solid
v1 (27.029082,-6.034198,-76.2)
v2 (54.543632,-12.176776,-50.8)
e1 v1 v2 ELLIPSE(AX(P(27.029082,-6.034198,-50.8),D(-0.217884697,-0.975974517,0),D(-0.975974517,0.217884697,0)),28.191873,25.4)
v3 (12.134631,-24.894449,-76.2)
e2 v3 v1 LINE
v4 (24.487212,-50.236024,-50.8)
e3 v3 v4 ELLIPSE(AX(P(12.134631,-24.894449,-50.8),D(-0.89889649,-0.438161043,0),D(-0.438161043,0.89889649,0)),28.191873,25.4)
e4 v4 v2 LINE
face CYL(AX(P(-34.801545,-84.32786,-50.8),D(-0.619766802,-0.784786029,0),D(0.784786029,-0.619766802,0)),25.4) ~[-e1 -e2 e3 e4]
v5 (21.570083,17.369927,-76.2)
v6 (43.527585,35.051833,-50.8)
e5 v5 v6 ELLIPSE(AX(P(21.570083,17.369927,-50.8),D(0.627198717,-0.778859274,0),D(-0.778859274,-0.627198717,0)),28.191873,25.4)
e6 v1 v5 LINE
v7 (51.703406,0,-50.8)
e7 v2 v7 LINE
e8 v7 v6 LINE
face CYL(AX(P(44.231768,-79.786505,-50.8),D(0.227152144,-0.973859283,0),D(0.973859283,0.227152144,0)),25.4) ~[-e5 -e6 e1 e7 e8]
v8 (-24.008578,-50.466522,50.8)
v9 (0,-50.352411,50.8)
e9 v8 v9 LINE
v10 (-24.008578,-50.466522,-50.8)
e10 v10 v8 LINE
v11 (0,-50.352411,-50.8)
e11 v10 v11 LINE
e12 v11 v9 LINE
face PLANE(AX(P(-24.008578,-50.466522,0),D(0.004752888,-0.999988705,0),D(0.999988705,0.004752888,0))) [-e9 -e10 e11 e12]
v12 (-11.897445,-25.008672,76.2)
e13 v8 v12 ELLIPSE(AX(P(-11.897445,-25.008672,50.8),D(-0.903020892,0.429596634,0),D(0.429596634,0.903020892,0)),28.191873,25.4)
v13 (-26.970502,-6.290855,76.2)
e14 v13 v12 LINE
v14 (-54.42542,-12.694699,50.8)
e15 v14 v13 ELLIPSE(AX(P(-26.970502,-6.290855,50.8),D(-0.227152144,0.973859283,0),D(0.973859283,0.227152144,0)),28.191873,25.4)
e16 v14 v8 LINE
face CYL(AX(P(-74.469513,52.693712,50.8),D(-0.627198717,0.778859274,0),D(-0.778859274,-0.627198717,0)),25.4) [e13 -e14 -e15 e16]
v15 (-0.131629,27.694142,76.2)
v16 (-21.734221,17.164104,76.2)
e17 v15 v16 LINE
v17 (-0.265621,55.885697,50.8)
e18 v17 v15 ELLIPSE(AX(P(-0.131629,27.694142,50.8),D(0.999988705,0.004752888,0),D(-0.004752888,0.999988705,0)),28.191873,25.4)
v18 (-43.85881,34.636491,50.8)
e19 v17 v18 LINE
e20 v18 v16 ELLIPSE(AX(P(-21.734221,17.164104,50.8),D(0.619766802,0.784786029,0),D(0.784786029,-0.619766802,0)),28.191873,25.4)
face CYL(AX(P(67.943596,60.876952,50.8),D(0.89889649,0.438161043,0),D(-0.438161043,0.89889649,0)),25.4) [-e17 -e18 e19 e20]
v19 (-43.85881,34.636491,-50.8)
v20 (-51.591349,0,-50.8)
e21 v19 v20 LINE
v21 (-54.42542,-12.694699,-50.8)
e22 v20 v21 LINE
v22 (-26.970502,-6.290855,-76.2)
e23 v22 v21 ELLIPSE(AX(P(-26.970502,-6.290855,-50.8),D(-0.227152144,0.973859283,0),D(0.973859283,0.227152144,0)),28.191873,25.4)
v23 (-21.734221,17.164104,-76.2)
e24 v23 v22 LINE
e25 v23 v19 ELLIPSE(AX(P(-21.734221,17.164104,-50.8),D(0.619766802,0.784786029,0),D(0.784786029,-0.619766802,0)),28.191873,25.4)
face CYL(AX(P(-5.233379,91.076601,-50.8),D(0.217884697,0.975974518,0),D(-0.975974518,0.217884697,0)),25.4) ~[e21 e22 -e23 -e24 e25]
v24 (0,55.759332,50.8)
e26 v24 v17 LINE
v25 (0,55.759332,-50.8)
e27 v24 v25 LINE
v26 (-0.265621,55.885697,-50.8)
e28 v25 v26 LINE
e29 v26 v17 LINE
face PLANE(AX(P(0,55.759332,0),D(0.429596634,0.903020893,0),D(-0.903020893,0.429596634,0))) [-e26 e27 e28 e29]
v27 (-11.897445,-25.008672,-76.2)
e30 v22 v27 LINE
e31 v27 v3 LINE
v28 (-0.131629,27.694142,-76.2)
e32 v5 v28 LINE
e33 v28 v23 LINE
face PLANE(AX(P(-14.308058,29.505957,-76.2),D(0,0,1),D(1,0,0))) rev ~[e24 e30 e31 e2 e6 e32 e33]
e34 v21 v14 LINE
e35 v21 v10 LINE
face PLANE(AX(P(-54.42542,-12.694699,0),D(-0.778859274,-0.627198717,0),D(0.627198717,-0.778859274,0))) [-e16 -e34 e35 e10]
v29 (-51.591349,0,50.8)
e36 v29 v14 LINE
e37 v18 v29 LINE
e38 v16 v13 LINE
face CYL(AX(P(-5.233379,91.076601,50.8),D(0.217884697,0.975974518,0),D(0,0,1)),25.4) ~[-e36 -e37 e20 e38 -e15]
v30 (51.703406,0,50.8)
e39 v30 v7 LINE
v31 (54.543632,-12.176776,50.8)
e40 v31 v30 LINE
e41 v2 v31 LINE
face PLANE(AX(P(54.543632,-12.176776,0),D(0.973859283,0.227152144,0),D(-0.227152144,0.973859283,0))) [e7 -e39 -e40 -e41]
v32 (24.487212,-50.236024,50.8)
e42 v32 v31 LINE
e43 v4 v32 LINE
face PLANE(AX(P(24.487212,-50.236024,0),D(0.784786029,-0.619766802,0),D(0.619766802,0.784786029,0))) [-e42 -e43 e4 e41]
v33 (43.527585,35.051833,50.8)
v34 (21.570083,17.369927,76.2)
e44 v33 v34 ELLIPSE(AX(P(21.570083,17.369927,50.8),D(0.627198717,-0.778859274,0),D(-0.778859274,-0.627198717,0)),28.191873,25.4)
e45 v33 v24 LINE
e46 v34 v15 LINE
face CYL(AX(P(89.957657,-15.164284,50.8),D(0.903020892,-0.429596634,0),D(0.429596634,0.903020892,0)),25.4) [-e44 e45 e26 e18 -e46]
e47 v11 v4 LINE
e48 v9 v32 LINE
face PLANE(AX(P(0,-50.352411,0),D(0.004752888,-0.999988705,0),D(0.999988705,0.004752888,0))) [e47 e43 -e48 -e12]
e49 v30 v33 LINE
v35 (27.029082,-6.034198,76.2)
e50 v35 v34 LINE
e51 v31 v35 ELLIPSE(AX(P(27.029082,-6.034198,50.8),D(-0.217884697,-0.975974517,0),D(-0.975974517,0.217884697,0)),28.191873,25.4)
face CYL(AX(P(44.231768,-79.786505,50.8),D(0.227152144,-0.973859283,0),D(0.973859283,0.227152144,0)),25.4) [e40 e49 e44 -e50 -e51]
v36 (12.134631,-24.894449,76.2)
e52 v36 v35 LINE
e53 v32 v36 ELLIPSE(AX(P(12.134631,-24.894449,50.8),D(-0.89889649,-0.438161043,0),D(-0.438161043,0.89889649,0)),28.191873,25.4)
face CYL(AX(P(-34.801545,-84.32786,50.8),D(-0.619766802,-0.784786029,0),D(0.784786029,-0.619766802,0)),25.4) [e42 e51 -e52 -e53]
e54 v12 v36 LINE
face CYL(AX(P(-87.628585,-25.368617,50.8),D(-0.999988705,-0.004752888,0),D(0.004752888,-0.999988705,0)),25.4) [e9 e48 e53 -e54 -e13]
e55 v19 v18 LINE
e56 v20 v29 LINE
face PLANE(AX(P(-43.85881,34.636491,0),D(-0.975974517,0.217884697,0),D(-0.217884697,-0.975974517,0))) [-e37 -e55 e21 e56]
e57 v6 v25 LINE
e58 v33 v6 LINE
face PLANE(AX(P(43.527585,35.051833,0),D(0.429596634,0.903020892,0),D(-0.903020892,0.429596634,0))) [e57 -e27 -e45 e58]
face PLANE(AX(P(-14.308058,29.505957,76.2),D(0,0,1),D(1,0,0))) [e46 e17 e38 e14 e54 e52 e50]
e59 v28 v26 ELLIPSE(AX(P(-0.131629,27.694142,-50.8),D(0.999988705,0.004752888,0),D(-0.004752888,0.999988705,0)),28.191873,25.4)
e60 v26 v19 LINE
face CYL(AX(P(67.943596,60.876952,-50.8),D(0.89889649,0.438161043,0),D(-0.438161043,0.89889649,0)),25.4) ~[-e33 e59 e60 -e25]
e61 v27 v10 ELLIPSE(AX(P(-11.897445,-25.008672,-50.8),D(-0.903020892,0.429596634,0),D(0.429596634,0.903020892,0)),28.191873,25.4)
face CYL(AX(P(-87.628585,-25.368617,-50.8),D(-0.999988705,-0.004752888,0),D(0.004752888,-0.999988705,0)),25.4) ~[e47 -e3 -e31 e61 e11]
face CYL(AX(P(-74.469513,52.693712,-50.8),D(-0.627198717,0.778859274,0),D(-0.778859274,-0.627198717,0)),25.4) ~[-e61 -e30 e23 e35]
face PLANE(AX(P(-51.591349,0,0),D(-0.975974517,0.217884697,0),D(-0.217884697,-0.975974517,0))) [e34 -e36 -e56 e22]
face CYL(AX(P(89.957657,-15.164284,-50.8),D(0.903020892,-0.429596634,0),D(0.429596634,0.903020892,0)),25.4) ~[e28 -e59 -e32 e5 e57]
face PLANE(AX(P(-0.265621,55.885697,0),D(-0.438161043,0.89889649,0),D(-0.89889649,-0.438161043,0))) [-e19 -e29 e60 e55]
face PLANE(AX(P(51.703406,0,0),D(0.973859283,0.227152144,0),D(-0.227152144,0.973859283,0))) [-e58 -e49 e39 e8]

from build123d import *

# Parameters (mm, degrees)
F1_DEPTH     = 76.2
F2_T1_DEPTH  = 175.4963381321
F2_T3_DEPTH  = 175.4963381321
F2_T5_DEPTH  = 175.4963381321
F2_T7_DEPTH  = 175.4963381321
F2_T9_DEPTH  = 175.4963381321
F2_T11_DEPTH = 175.4963381321
F2_T13_DEPTH = 175.4963381321


# Not quite as in the source:
# - a fillet or chamfer that OpenCascade refuses, or shapes differently, is made with other operations: its cross-section is extruded or revolved along the edge and cut away or added


with BuildPart() as f1:
    # F0 (on Top) → F1 (new body, symmetric)
    with BuildSketch(Plane.XY):
        Polygon((0, 0), (0, 55.7593321666), (-0.2656214809, 55.8856970104), (-43.8588096269, 34.6364909196), align=None)
        Polygon((0, 0), (43.5275850579, 35.051833392), (0, 55.7593321666), align=None)
        Polygon((51.7034059885, 0), (43.5275850579, 35.051833392), (0, 0), align=None)
        Polygon((24.487211867, -50.2360243261), (54.5436322472, -12.1767756978), (0, 0), align=None)
        Polygon((0, -50.3524106258), (0, 0), (-24.0085784972, -50.4665220087), align=None)
        Polygon((24.487211867, -50.2360243261), (0, 0), (0, -50.3524106258), align=None)
        Polygon((-24.0085784972, -50.4665220087), (0, 0), (-54.4254195672, -12.6946992894), align=None)
        Polygon((-51.5913489447, 0), (0, 0), (-43.8588096269, 34.6364909196), align=None)
        Polygon((-54.4254195672, -12.6946992894), (0, 0), (-51.5913489447, 0), align=None)
        Polygon((0, 0), (54.5436322472, -12.1767756978), (51.7034059885, 0), align=None)
    extrude(amount=F1_DEPTH, both=True)

    # F2: fillet of radius 25.4 on 14 edges, made by hand

    # F2_s2 → F2_t1 (cut)
    with BuildSketch(Plane(origin=(78.8765212158, 38.447829267, 0), x_dir=(0, 0, 1), z_dir=(-0.8988964904, -0.4381610429, 0))):
        with BuildLine():
            ThreePointArc((-50.8, 50.3518418934), (-68.7605122421, 42.9123541355), (-76.2, 24.9518418934))
            Line((-76.2, 24.9518418934), (-76.2, 50.3518418934))
            Line((-76.2, 50.3518418934), (-50.8, 50.3518418934))
        make_face()
        with BuildLine():
            ThreePointArc((50.8, 50.3518418934), (68.7605122421, 42.9123541355), (76.2, 24.9518418934))
            Line((76.2, 24.9518418934), (76.2, 50.3518418934))
            Line((76.2, 50.3518418934), (50.8, 50.3518418934))
        make_face()
    extrude(amount=F2_T1_DEPTH, mode=Mode.SUBTRACT)

    # F2_s4 → F2_t3 (cut)
    with BuildSketch(Plane(origin=(19.1189832306, 85.6399769656, 0), x_dir=(0, 0, 1), z_dir=(-0.217884697, -0.9759745175, 0))):
        with BuildLine():
            ThreePointArc((-50.8, 50.3518418934), (-68.7605122421, 42.9123541355), (-76.2, 24.9518418934))
            Line((-76.2, 24.9518418934), (-76.2, 50.3518418934))
            Line((-76.2, 50.3518418934), (-50.8, 50.3518418934))
        make_face()
        with BuildLine():
            ThreePointArc((76.2, 24.9518418934), (68.7605122421, 42.9123541355), (50.8, 50.3518418934))
            Line((50.8, 50.3518418934), (76.2, 50.3518418934))
            Line((76.2, 50.3518418934), (76.2, 24.9518418934))
        make_face()
    extrude(amount=F2_T3_DEPTH, mode=Mode.SUBTRACT)

    # F2_s6 → F2_t5 (cut)
    with BuildSketch(Plane(origin=(-55.0355390834, 68.343475272, 0), x_dir=(0, 0, 1), z_dir=(0.6271987173, -0.7788592742, 0))):
        with BuildLine():
            ThreePointArc((-50.8, 50.3518418934), (-68.7605122421, 42.9123541355), (-76.2, 24.9518418934))
            Line((-76.2, 24.9518418934), (-76.2, 50.3518418934))
            Line((-76.2, 50.3518418934), (-50.8, 50.3518418934))
        make_face()
        with BuildLine():
            ThreePointArc((50.8, 50.3518418934), (68.7605122421, 42.9123541355), (76.2, 24.9518418934))
            Line((76.2, 24.9518418934), (76.2, 50.3518418934))
            Line((76.2, 50.3518418934), (50.8, 50.3518418934))
        make_face()
    extrude(amount=F2_T5_DEPTH, mode=Mode.SUBTRACT)

    # F2_s8 → F2_t7 (cut)
    with BuildSketch(Plane(origin=(-87.7471779472, -0.4170572543, 0), x_dir=(0, 0, 1), z_dir=(0.999988705, 0.0047528884, 0))):
        with BuildLine():
            ThreePointArc((-50.8, 50.3518418934), (-68.7605122421, 42.9123541355), (-76.2, 24.9518418934))
            Line((-76.2, 24.9518418934), (-76.2, 50.3518418934))
            Line((-76.2, 50.3518418934), (-50.8, 50.3518418934))
        make_face()
        with BuildLine():
            ThreePointArc((50.8, 50.3518418934), (68.7605122421, 42.9123541355), (76.2, 24.9518418934))
            Line((76.2, 24.9518418934), (76.2, 50.3518418934))
            Line((76.2, 50.3518418934), (50.8, 50.3518418934))
        make_face()
    extrude(amount=F2_T7_DEPTH, mode=Mode.SUBTRACT)

    # F2_s10 → F2_t9 (cut)
    with BuildSketch(Plane(origin=(-54.3834021005, -68.8635371617, 0), x_dir=(0, 0, 1), z_dir=(0.6197668017, 0.7847860291, 0))):
        with BuildLine():
            ThreePointArc((-50.8, 50.3518418934), (-68.7605122421, 42.9123541355), (-76.2, 24.9518418934))
            Line((-76.2, 24.9518418934), (-76.2, 50.3518418934))
            Line((-76.2, 50.3518418934), (-50.8, 50.3518418934))
        make_face()
        with BuildLine():
            ThreePointArc((50.8, 50.3518418934), (68.7605122421, 42.9123541355), (76.2, 24.9518418934))
            Line((76.2, 24.9518418934), (76.2, 50.3518418934))
            Line((76.2, 50.3518418934), (50.8, 50.3518418934))
        make_face()
    extrude(amount=F2_T9_DEPTH, mode=Mode.SUBTRACT)

    # F2_s12 → F2_t11 (cut)
    with BuildSketch(Plane(origin=(19.932184747, -85.4543690261, 0), x_dir=(0, 0, 1), z_dir=(-0.2271521441, 0.9738592832, 0))):
        with BuildLine():
            ThreePointArc((-50.8, 50.3518418934), (-68.7605122421, 42.9123541355), (-76.2, 24.9518418934))
            Line((-76.2, 24.9518418934), (-76.2, 50.3518418934))
            Line((-76.2, 50.3518418934), (-50.8, 50.3518418934))
        make_face()
        with BuildLine():
            ThreePointArc((50.8, 50.3518418934), (68.7605122421, 42.9123541355), (76.2, 24.9518418934))
            Line((76.2, 24.9518418934), (76.2, 50.3518418934))
            Line((76.2, 50.3518418934), (50.8, 50.3518418934))
        make_face()
    extrude(amount=F2_T11_DEPTH, mode=Mode.SUBTRACT)

    # F2_s14 → F2_t13 (cut)
    with BuildSketch(Plane(origin=(79.2384299376, -37.6963180625, 0), x_dir=(0, 0, 1), z_dir=(-0.9030208924, 0.4295966339, 0))):
        with BuildLine():
            ThreePointArc((-50.8, 50.3518418934), (-68.7605122421, 42.9123541355), (-76.2, 24.9518418934))
            Line((-76.2, 24.9518418934), (-76.2, 50.3518418934))
            Line((-76.2, 50.3518418934), (-50.8, 50.3518418934))
        make_face()
        with BuildLine():
            ThreePointArc((50.8, 50.3518418934), (68.7605122421, 42.9123541355), (76.2, 24.9518418934))
            Line((76.2, 24.9518418934), (76.2, 50.3518418934))
            Line((76.2, 50.3518418934), (50.8, 50.3518418934))
        make_face()
    extrude(amount=F2_T13_DEPTH, mode=Mode.SUBTRACT)


solid = f1.part
